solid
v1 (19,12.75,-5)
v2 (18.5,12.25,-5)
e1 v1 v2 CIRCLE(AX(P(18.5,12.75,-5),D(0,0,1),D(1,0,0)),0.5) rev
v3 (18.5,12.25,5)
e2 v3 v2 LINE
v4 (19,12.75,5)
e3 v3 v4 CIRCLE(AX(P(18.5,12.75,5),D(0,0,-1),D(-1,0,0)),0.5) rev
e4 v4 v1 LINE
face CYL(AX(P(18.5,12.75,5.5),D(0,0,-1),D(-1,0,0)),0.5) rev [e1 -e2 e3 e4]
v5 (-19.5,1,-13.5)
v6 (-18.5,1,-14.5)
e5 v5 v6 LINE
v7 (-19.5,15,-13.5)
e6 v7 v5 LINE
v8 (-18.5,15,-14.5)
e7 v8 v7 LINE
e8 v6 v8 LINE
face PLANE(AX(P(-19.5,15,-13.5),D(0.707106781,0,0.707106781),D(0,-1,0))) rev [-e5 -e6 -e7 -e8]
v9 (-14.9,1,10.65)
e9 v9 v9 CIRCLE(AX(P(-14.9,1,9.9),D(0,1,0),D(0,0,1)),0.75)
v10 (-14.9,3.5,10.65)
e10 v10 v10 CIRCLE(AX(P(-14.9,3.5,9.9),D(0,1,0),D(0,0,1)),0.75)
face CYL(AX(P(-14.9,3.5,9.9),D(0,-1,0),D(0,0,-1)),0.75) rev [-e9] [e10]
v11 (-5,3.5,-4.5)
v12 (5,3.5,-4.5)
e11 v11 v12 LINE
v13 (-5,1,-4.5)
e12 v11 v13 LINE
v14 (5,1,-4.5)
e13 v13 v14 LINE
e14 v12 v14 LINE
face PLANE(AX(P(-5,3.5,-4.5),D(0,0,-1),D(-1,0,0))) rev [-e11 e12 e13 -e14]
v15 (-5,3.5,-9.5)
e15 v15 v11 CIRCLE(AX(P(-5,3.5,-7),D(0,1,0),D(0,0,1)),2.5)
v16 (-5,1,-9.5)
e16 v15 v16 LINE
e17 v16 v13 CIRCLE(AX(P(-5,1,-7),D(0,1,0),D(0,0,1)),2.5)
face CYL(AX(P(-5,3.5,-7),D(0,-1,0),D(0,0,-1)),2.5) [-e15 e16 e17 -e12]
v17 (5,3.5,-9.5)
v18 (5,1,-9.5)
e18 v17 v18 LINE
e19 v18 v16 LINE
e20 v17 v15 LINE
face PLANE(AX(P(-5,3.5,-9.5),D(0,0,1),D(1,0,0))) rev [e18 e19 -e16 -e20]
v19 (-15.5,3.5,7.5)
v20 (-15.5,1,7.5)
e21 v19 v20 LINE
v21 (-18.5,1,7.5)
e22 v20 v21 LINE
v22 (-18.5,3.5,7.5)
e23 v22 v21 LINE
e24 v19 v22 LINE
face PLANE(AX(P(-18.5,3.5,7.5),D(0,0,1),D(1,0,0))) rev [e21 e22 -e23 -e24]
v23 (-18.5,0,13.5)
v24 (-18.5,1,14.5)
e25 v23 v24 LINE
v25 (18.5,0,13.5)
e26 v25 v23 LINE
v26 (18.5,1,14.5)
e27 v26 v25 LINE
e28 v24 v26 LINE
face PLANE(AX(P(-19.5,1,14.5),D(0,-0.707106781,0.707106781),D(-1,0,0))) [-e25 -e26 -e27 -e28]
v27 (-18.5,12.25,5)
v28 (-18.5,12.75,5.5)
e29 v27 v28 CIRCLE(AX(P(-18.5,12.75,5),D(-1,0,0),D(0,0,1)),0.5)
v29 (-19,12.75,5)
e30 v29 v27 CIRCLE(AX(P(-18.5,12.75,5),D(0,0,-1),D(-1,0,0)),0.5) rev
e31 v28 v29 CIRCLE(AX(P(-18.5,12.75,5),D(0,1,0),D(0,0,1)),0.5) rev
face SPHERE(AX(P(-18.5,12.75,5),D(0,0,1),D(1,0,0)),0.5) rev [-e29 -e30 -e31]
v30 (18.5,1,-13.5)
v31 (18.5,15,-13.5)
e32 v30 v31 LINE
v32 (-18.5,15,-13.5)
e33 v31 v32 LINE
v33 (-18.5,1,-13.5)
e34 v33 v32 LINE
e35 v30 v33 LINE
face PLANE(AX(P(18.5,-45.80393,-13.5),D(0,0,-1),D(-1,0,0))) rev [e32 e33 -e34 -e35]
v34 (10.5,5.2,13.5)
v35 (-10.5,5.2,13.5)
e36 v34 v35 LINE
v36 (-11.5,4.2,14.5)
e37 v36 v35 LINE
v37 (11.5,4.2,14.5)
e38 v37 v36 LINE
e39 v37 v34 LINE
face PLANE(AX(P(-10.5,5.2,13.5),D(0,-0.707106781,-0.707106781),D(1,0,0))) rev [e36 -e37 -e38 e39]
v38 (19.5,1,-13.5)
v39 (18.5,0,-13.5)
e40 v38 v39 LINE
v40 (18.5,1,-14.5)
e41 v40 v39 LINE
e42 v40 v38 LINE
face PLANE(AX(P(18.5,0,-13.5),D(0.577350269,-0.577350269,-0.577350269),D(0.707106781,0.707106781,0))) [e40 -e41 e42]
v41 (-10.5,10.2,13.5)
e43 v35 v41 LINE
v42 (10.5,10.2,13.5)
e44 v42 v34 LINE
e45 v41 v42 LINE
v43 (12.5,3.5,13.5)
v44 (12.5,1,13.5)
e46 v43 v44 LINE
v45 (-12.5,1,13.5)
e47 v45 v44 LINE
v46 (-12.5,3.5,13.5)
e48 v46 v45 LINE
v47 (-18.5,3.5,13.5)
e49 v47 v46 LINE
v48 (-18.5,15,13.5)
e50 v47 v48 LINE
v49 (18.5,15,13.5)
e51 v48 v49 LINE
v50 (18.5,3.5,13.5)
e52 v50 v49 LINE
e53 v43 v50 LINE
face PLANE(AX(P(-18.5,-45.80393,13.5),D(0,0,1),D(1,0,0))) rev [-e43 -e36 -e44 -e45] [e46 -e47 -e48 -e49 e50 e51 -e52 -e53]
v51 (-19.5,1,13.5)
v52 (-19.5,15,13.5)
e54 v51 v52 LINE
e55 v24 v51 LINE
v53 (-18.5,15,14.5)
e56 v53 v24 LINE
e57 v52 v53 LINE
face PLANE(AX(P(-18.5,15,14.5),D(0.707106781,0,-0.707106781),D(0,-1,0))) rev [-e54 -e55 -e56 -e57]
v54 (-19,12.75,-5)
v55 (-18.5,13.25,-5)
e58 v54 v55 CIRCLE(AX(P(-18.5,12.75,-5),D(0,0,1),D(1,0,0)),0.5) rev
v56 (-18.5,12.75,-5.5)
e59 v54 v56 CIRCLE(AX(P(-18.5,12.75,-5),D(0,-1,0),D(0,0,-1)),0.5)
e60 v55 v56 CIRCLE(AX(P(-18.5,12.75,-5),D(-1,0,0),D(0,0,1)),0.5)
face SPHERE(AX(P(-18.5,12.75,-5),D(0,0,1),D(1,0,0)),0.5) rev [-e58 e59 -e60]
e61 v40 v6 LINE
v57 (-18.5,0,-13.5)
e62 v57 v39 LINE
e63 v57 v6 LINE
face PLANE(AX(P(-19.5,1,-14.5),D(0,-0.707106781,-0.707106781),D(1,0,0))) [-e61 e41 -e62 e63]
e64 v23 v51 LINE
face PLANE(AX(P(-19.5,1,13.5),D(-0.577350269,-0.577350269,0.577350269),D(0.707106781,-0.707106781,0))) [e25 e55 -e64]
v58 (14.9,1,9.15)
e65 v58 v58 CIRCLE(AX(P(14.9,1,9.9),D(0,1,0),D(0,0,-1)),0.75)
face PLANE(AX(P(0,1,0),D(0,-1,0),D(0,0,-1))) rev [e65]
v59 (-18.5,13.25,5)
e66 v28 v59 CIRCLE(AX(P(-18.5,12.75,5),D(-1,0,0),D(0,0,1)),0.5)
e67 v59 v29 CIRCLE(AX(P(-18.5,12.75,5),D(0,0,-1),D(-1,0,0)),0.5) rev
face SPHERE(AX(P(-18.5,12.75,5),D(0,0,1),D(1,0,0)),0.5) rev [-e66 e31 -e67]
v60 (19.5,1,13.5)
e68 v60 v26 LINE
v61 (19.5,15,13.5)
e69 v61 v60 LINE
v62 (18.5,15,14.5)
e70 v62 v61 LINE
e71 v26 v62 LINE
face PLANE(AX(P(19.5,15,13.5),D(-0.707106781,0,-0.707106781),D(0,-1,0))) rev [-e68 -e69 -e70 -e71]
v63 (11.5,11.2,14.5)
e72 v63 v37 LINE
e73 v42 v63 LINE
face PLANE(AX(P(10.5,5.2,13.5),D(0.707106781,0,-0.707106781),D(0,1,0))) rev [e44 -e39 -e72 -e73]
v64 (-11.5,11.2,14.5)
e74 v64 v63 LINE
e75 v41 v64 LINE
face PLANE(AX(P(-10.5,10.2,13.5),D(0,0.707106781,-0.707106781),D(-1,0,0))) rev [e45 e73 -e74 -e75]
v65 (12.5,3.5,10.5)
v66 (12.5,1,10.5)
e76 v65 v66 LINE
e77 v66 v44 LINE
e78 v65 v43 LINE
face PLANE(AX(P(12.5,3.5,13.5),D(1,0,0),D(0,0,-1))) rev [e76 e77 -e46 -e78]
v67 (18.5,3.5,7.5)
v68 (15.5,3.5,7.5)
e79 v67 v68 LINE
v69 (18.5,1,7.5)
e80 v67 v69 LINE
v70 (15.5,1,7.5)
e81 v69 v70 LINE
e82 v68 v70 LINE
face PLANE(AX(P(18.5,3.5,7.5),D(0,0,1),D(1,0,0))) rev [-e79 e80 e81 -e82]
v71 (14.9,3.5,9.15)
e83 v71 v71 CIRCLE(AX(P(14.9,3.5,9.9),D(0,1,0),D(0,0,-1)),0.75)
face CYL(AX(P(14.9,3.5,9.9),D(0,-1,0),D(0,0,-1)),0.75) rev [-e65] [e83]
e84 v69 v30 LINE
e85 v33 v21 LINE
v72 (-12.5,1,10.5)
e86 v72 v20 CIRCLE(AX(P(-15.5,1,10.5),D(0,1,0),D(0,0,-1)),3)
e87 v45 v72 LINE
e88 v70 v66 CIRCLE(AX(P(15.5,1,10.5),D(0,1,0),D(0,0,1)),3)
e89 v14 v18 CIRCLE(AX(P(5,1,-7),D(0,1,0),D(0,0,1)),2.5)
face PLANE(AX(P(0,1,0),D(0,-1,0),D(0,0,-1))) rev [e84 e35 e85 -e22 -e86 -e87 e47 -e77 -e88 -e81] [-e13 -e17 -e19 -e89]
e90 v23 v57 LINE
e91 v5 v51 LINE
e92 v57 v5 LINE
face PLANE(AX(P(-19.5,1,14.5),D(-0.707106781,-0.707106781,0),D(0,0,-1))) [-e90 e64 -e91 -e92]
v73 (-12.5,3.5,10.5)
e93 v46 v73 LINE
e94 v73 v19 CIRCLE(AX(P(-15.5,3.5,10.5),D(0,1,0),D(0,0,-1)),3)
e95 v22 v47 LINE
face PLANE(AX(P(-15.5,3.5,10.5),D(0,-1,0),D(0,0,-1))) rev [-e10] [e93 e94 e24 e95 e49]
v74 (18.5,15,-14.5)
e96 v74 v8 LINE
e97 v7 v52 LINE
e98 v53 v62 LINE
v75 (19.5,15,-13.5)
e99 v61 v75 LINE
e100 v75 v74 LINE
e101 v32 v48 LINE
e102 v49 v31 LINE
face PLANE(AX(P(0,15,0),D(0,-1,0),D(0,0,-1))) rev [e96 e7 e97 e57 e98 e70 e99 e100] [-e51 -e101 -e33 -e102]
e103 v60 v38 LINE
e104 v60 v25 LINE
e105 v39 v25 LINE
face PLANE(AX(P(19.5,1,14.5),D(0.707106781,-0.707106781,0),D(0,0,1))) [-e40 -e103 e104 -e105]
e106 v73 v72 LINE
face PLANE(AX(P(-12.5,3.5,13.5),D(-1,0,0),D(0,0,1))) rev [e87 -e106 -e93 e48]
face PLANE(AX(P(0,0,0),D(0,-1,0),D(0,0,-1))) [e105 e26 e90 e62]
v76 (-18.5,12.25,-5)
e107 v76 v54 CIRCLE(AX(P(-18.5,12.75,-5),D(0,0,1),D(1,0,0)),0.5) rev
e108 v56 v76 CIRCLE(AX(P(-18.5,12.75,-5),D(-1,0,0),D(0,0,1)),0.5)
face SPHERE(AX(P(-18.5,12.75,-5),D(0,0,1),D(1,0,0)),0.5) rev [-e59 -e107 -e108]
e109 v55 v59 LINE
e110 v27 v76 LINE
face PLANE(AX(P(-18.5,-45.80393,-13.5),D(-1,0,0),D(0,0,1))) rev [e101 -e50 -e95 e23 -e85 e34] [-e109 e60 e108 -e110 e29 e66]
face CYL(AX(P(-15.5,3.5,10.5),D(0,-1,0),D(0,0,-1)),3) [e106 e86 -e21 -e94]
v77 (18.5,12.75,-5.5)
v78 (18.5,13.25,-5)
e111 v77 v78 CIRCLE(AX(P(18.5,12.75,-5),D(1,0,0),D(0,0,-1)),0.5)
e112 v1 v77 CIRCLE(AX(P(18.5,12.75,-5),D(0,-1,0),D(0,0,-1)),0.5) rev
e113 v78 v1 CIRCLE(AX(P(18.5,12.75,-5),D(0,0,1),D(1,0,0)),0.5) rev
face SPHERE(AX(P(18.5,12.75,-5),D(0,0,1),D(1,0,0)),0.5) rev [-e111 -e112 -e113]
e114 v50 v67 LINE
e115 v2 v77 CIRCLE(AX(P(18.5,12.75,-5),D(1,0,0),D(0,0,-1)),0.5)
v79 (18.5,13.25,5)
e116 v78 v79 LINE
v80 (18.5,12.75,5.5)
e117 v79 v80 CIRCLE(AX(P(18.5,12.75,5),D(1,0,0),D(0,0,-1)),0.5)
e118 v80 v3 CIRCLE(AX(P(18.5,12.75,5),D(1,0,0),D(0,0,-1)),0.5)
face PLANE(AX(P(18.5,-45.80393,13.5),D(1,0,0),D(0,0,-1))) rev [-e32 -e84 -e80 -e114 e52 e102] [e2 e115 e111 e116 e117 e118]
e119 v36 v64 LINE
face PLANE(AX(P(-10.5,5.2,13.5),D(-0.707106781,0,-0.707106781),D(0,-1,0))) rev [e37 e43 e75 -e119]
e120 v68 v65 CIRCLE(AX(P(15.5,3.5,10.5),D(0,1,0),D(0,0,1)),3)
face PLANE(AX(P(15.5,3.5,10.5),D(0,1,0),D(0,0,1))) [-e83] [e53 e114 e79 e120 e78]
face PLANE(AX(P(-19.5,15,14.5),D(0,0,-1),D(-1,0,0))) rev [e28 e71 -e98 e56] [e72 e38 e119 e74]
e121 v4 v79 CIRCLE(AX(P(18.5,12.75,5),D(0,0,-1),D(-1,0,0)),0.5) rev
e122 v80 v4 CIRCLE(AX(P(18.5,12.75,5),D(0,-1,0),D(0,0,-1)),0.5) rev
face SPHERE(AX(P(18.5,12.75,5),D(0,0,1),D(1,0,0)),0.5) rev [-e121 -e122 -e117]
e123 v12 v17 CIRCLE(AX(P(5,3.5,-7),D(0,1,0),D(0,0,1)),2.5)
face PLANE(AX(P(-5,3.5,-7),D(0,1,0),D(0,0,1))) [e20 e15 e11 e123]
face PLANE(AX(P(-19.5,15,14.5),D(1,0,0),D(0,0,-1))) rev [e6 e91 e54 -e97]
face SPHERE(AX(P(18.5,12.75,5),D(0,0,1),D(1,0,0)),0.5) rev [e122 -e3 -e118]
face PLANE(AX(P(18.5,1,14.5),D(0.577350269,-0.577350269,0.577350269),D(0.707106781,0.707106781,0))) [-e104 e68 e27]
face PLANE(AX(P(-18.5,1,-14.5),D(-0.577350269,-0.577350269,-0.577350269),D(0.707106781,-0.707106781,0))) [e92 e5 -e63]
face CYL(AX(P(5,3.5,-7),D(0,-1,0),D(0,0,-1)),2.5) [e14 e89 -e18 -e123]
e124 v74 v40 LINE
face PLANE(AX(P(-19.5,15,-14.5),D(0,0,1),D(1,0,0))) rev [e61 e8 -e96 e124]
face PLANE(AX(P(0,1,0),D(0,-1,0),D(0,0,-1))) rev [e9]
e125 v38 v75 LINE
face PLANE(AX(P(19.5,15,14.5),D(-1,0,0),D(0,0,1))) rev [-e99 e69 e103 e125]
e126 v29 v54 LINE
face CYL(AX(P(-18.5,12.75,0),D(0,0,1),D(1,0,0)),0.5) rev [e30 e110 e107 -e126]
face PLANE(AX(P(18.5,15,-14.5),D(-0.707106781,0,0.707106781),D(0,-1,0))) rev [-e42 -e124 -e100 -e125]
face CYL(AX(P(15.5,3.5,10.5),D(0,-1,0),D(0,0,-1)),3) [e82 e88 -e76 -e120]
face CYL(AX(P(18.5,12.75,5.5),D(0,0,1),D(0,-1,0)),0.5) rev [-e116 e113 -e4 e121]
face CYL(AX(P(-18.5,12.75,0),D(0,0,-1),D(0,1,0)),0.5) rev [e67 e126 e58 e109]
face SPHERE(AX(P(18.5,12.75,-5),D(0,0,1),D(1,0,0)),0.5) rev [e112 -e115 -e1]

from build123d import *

# Parameters (mm, degrees)
SKETCH1_W            = 39
SKETCH1_H            = 29
BOSS_EXTRUDE1_DEPTH  = 15
SKETCH2_W            = 37
SKETCH2_H            = 27
CUT_EXTRUDE1_DEPTH   = 14
CHAMFER1_SIZE        = 1
CUT_EXTRUDE2_REACH   = 40.03
SKETCH3_W            = 21
SKETCH3_H            = 5
SKETCH4_W            = 11
SKETCH4_H            = 1
CUT_EXTRUDE3_DEPTH   = 0.5
FILLET1_R            = 0.5
FILLET1_OF_MIRROR2_R = 0.5
SKETCH5_R            = 0.75
BOSS_EXTRUDE2_DEPTH  = 2.5
CHAMFER2_SIZE        = 1


with BuildPart() as part:
    # Sketch1 → Boss-Extrude1 (new body)
    with BuildSketch(Plane(origin=(0, 0, 0), x_dir=(1, 0, 0), z_dir=(0, 1, 0))):
        Rectangle(SKETCH1_W, SKETCH1_H)
    extrude(amount=BOSS_EXTRUDE1_DEPTH)

    # Sketch2 → Cut-Extrude1 (cut)
    with BuildSketch(Plane(origin=(0, 15, 0), x_dir=(1, 0, 0), z_dir=(0, 1, 0))):
        Rectangle(SKETCH2_W, SKETCH2_H)
    extrude(amount=-CUT_EXTRUDE1_DEPTH, mode=Mode.SUBTRACT)

    # Chamfer1
    chamfer1_edges = [part.edges().sort_by_distance(p)[0] for p in [
        (0, 0, 14.5),
        (-19.5, 0, 0),
        (0, 0, -14.5),
        (19.5, 0, 0),
        (19.5, 7.5, 14.5),
        (-19.5, 7.5, 14.5),
        (-19.5, 7.5, -14.5),
        (19.5, 7.5, -14.5),
    ]]
    chamfer(chamfer1_edges, length=CHAMFER1_SIZE)

    # Sketch3 → Cut-Extrude2 (cut, up to next)
    with BuildSketch(Plane.XY.offset(14.5), mode=Mode.PRIVATE) as cut_extrude2_sk1:
        with Locations((0, 7.7)):
            Rectangle(SKETCH3_W, SKETCH3_H)
    cut_extrude2_tool1 = extrude(cut_extrude2_sk1.sketch, amount=-CUT_EXTRUDE2_REACH, mode=Mode.PRIVATE) & part.part
    add(cut_extrude2_tool1.solids().sort_by_distance((0, 7.7, 14.5))[0], mode=Mode.SUBTRACT)

    # Sketch4 → Cut-Extrude3 (cut)
    with BuildSketch(Plane(origin=(-18.5, 0, 0), x_dir=(0, 0, -1), z_dir=(1, 0, 0))):
        with Locations((0, 12.75)):
            Rectangle(SKETCH4_W, SKETCH4_H)
    cut_extrude3 = extrude(amount=-CUT_EXTRUDE3_DEPTH, mode=Mode.SUBTRACT)

    # Fillet1
    fillet1_edges = [part.edges().sort_by_distance(p)[0] for p in [
        (-19, 12.75, 5.5),
    ]]
    fillet(fillet1_edges, radius=FILLET1_R - 0.0001)  # a hair under: the kernel refuses the full size
    fillet1_2_edges = [part.edges().sort_by_distance(p)[0] for p in [
        (-19, 13.25, -0.24995),
    ]]
    fillet(fillet1_2_edges, radius=FILLET1_R - 0.0001)  # a hair under: the kernel refuses the full size
    fillet1_3_edges = [part.edges().sort_by_distance(p)[0] for p in [
        (-19, 12.50005, -5.5),
    ]]
    fillet(fillet1_3_edges, radius=FILLET1_R - 0.0001)  # a hair under: the kernel refuses the full size
    fillet1_4_edges = [part.edges().sort_by_distance(p)[0] for p in [
        (-19, 12.25, 0),
    ]]
    fillet(fillet1_4_edges, radius=FILLET1_R - 0.0001)  # a hair under: the kernel refuses the full size

    # Mirror2: Cut-Extrude3 across plane
    add(cut_extrude3.mirror(Plane(origin=(0, 0, 0), x_dir=(0, 0, 1), z_dir=(1, 0, 0))), mode=Mode.SUBTRACT)

    # Fillet1 of Mirror2
    fillet1_of_mirror2_edges = [part.edges().sort_by_distance(p)[0] for p in [
        (19, 12.25, 0),
    ]]
    fillet(fillet1_of_mirror2_edges, radius=FILLET1_OF_MIRROR2_R - 0.0001)  # a hair under: the kernel refuses the full size
    fillet1_of_mirror2_2_edges = [part.edges().sort_by_distance(p)[0] for p in [
        (19, 12.99995, -5.5),
    ]]
    fillet(fillet1_of_mirror2_2_edges, radius=FILLET1_OF_MIRROR2_R - 0.0001)  # a hair under: the kernel refuses the full size
    fillet1_of_mirror2_3_edges = [part.edges().sort_by_distance(p)[0] for p in [
        (19, 13.25, 0.24995),
    ]]
    fillet(fillet1_of_mirror2_3_edges, radius=FILLET1_OF_MIRROR2_R - 0.0001)  # a hair under: the kernel refuses the full size
    fillet1_of_mirror2_4_edges = [part.edges().sort_by_distance(p)[0] for p in [
        (19, 12.75, 5.5),
    ]]
    fillet(fillet1_of_mirror2_4_edges, radius=FILLET1_OF_MIRROR2_R - 0.0001)  # a hair under: the kernel refuses the full size

    # Sketch5 → Boss-Extrude2 (add)
    # profile 1 of 3: a face of its own
    with BuildSketch(Plane(origin=(0, 1, 0), x_dir=(1, 0, 0), z_dir=(0, 1, 0))):
        with BuildLine():
            Line((-18.5, -13.5), (-12.5, -13.5))
            Line((-12.5, -13.5), (-12.5, -10.5))
            ThreePointArc((-12.5, -10.5), (-13.378679656, -8.378679656), (-15.5, -7.5))
            Line((-15.5, -7.5), (-18.5, -7.5))
            Line((-18.5, -7.5), (-18.5, -13.5))
        make_face()
        with Locations(Location((-14.9, -9.9, 0), (0, 0, 270))):
            Circle(SKETCH5_R, mode=Mode.SUBTRACT)
    # profile 2 of 3: a face of its own
    with BuildSketch(Plane(origin=(0, 1, 0), x_dir=(1, 0, 0), z_dir=(0, 1, 0))):
        with BuildLine():
            Line((-5, 9.5), (5, 9.5))
            ThreePointArc((5, 9.5), (7.5, 7), (5, 4.5))
            Line((5, 4.5), (-5, 4.5))
            ThreePointArc((-5, 4.5), (-7.5, 7), (-5, 9.5))
        make_face()
    # profile 3 of 3: a face of its own
    with BuildSketch(Plane(origin=(0, 1, 0), x_dir=(1, 0, 0), z_dir=(0, 1, 0))):
        with BuildLine():
            Line((12.5, -13.5), (12.5, -10.5))
            ThreePointArc((12.5, -10.5), (13.378679656, -8.378679656), (15.5, -7.5))
            Line((15.5, -7.5), (18.5, -7.5))
            Line((18.5, -7.5), (18.5, -13.5))
            Line((18.5, -13.5), (12.5, -13.5))
        make_face()
        with Locations(Location((14.9, -9.9, 0), (0, 0, 90))):
            Circle(SKETCH5_R, mode=Mode.SUBTRACT)
    extrude(amount=BOSS_EXTRUDE2_DEPTH)

    # Chamfer2
    chamfer2_edges = [part.edges().sort_by_distance(p)[0] for p in [
        (-10.5, 7.7, 14.5),
        (0, 5.2, 14.5),
        (10.5, 7.7, 14.5),
        (0, 10.2, 14.5),
    ]]
    chamfer(chamfer2_edges, length=CHAMFER2_SIZE - 0.0001)  # a hair under: the kernel refuses the full size


solid = part.part
